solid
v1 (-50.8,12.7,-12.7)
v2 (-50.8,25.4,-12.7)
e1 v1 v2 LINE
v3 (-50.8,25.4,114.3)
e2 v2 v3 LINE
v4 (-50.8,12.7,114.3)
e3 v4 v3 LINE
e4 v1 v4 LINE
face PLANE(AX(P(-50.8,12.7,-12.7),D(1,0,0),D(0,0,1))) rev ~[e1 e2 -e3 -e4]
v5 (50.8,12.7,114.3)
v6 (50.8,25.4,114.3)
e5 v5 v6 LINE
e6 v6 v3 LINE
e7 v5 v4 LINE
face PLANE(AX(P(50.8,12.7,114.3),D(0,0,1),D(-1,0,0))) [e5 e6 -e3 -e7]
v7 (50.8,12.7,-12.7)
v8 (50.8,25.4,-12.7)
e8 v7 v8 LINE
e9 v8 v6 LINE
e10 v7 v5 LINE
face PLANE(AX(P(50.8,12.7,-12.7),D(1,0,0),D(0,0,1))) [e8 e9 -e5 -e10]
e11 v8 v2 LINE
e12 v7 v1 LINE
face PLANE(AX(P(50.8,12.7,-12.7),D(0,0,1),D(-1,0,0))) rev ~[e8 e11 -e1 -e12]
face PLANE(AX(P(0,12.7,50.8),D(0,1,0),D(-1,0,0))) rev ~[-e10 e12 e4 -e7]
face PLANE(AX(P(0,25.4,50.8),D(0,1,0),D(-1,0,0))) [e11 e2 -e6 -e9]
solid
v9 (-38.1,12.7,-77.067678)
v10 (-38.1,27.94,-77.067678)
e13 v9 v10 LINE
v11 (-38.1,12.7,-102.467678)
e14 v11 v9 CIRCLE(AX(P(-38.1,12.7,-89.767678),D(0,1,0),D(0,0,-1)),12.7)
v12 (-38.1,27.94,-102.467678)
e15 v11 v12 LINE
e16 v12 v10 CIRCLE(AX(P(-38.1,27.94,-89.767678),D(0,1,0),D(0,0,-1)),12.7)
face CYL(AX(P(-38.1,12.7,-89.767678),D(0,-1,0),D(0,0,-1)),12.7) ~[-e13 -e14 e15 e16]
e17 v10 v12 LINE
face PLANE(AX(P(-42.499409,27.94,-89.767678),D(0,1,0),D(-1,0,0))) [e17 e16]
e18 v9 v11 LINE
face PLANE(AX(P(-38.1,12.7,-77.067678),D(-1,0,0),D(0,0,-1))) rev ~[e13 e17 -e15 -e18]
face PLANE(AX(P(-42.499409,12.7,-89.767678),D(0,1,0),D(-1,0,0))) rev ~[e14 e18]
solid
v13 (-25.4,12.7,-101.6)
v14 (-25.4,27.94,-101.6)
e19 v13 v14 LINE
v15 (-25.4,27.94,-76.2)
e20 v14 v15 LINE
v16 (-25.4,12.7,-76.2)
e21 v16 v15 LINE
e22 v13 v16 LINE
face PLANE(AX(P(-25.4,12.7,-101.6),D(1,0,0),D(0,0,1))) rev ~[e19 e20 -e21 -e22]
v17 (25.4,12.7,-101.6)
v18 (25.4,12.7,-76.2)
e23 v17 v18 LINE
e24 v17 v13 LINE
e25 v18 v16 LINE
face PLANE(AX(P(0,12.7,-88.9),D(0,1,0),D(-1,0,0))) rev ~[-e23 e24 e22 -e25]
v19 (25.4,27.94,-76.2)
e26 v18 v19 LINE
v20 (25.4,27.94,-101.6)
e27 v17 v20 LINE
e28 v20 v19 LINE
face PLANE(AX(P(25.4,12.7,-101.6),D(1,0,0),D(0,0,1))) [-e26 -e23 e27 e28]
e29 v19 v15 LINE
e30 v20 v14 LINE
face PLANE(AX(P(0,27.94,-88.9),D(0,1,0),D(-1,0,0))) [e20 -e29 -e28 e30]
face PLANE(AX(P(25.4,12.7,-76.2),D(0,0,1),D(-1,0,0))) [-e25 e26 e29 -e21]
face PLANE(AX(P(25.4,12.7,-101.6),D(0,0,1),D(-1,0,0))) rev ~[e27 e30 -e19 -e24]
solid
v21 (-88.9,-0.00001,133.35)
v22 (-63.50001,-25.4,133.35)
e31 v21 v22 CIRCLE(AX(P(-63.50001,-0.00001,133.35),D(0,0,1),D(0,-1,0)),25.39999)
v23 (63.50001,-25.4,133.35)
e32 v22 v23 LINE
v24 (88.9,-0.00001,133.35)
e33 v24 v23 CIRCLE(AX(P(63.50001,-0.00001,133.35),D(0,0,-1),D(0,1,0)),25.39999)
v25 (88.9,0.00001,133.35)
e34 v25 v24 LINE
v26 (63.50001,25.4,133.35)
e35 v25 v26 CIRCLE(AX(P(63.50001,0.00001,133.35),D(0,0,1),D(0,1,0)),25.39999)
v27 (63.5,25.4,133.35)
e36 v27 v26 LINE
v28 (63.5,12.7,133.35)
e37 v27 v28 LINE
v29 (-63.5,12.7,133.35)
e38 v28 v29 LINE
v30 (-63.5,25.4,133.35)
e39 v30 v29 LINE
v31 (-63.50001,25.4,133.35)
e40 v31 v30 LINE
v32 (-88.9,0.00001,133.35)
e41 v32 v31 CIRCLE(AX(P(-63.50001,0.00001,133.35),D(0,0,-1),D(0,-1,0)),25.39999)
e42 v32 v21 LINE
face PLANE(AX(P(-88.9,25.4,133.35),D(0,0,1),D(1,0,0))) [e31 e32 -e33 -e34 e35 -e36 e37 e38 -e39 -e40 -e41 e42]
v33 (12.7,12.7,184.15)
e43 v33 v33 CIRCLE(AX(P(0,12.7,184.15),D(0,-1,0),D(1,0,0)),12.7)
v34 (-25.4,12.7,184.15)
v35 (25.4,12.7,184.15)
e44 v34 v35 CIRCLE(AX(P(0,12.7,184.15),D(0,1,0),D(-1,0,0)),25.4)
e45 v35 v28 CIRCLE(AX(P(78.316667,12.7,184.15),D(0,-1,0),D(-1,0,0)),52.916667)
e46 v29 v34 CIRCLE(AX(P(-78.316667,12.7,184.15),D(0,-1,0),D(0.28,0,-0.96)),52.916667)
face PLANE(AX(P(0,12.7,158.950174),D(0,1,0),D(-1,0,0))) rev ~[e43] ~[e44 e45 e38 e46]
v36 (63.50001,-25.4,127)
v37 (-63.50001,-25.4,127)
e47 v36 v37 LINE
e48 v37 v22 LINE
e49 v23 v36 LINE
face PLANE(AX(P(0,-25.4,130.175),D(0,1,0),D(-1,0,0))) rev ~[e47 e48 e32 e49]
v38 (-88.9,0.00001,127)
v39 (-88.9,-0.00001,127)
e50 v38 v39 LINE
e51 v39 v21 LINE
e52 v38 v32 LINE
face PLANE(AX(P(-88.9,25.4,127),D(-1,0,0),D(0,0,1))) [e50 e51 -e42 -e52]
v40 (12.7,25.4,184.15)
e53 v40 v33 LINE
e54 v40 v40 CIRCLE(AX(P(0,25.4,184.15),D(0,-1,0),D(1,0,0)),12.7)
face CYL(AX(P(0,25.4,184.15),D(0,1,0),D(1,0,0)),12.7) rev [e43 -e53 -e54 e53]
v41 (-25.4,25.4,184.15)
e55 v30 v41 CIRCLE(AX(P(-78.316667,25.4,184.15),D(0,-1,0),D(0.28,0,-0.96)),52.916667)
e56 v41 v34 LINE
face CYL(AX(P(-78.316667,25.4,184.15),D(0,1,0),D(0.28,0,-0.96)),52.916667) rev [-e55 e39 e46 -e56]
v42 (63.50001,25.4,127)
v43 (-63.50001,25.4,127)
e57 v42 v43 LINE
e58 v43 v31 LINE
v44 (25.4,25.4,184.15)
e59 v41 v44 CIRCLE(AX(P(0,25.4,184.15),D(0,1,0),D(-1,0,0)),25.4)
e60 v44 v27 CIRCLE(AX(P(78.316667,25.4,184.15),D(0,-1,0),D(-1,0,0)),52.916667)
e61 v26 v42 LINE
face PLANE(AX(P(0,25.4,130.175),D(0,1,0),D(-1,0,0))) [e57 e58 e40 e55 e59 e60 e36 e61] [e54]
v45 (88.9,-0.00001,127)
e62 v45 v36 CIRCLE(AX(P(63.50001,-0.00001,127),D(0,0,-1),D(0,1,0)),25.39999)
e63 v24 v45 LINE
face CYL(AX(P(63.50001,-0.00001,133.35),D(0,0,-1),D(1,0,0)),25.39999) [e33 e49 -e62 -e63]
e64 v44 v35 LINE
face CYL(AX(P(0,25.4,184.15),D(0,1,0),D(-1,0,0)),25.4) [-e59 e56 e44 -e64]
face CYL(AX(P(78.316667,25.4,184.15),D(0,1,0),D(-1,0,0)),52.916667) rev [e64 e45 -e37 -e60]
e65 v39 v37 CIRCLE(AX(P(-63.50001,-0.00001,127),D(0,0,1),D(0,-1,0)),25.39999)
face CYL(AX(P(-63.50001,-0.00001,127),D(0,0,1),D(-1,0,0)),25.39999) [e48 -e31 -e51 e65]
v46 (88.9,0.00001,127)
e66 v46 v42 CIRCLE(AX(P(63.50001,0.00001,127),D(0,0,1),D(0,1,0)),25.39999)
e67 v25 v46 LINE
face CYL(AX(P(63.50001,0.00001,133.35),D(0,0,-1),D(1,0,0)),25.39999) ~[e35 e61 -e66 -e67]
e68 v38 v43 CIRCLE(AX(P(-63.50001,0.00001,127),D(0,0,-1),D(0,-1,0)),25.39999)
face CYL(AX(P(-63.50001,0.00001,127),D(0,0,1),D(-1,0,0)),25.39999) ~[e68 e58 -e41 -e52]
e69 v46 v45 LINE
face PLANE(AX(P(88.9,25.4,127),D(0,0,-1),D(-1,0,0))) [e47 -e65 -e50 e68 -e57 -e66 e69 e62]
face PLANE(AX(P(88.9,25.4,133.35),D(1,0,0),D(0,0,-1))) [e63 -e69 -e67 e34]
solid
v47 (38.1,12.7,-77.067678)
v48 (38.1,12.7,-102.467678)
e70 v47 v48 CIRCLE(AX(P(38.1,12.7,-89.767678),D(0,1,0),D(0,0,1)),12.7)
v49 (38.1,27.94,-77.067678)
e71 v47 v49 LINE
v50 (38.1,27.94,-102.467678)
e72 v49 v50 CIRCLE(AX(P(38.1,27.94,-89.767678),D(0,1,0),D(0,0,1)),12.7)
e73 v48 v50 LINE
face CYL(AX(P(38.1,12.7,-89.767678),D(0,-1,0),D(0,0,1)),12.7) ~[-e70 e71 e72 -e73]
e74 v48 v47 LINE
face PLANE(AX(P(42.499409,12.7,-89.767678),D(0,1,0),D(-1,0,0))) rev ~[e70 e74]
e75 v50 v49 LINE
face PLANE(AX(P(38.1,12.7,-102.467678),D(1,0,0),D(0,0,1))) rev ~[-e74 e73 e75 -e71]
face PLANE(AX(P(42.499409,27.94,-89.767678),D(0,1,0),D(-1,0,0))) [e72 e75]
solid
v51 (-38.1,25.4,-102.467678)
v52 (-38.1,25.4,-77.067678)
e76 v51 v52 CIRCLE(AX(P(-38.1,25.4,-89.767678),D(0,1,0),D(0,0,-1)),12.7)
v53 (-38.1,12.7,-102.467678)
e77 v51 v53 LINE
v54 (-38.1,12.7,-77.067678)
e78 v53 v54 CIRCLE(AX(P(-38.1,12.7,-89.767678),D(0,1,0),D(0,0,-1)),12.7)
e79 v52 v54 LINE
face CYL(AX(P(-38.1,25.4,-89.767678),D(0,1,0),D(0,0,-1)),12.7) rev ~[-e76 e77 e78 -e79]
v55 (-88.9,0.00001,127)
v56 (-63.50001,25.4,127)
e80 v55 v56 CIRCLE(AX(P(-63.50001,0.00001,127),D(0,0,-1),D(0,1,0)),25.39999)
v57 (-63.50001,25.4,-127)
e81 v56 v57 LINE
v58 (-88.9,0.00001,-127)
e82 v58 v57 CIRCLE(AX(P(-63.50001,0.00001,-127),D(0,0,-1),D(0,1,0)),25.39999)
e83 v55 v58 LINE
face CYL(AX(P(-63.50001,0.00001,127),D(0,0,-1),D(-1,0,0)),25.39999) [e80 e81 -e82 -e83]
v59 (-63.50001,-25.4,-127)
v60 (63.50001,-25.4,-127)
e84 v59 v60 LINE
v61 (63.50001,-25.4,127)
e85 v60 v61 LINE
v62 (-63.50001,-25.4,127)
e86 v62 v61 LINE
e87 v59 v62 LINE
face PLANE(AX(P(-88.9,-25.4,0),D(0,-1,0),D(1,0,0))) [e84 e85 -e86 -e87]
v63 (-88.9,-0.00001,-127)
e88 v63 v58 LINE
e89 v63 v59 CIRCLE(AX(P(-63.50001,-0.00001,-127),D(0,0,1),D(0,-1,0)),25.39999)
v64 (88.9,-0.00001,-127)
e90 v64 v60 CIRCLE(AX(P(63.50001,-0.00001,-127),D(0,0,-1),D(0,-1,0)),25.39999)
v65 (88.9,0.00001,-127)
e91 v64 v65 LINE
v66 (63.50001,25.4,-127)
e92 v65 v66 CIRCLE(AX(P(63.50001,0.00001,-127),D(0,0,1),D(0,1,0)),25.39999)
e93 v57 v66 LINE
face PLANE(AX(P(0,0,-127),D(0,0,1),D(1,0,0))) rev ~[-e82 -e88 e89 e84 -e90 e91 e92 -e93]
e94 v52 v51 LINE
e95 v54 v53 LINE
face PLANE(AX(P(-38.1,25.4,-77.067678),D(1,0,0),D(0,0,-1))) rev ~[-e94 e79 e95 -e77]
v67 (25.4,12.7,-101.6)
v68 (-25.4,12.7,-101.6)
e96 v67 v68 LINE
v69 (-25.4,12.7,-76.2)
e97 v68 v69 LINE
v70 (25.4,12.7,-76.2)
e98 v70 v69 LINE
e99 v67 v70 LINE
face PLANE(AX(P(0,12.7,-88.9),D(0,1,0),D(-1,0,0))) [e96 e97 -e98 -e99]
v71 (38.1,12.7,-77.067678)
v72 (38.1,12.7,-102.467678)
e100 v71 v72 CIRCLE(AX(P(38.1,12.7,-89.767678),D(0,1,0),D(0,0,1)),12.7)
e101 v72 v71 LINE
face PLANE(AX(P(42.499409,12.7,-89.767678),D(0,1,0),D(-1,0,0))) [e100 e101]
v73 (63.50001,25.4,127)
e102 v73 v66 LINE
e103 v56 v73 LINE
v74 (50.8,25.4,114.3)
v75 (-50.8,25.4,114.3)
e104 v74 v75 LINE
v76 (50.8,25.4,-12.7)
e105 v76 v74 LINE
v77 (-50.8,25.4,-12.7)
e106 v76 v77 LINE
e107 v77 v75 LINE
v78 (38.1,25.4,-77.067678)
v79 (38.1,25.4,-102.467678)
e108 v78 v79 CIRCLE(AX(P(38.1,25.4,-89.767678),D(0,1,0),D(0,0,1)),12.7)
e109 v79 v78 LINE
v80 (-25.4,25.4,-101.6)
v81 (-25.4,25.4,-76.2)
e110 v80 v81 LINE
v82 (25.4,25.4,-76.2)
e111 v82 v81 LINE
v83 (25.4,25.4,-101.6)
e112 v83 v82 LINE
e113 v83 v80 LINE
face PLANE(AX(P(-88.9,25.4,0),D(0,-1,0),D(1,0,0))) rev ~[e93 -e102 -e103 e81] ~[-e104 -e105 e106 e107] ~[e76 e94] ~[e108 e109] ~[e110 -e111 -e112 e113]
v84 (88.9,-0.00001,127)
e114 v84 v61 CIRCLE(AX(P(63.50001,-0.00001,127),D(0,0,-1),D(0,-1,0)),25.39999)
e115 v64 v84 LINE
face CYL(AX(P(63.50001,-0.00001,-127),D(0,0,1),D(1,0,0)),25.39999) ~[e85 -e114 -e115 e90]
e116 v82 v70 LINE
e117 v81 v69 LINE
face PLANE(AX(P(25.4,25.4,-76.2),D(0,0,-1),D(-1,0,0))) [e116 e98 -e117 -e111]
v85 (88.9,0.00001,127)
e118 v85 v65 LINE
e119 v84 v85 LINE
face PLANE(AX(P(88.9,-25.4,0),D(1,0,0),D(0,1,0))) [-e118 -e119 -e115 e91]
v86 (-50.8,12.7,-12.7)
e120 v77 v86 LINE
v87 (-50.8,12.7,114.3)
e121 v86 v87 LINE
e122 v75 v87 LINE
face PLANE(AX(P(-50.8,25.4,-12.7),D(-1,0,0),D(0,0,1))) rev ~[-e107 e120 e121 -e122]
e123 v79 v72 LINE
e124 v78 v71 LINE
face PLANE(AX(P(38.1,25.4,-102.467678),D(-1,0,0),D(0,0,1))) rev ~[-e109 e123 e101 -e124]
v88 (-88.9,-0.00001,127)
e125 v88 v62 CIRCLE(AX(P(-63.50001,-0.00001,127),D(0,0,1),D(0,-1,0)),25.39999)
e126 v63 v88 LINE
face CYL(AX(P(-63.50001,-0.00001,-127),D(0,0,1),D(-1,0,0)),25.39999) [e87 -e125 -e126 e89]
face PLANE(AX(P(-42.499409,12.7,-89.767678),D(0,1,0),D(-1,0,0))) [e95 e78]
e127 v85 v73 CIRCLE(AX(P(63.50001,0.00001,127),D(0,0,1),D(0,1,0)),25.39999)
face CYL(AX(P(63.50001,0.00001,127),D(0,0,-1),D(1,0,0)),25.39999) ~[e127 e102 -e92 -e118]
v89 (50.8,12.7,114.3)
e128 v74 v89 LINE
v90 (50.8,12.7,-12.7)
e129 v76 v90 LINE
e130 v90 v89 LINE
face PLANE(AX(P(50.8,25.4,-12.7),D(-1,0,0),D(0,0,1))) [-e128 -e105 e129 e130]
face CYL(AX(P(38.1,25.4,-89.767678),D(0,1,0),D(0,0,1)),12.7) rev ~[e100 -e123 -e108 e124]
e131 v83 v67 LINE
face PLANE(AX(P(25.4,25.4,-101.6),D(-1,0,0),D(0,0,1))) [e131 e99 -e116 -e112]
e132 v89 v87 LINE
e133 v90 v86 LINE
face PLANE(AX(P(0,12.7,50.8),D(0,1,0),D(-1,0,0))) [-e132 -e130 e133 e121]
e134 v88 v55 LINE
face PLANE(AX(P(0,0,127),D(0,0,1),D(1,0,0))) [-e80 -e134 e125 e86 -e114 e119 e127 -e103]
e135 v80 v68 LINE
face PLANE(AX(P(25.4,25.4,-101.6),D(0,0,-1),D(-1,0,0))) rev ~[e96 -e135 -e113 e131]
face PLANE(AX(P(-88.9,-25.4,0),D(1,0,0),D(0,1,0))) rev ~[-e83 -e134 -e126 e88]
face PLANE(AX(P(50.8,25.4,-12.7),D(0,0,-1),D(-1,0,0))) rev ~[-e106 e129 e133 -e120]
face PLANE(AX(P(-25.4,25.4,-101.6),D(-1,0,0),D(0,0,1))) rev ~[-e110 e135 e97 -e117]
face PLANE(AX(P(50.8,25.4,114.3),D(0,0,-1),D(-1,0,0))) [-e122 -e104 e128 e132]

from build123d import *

# Parameters (mm, degrees)
F0_W      = 177.8
F0_H      = 50.8
F1_DEPTH  = 127
F2_R      = 25.39999
F3_W      = 101.6
F3_H      = 127
F3_W_2    = 50.8
F3_H_2    = 25.4
F4_DEPTH  = 12.7
F5_DEPTH  = 15.24
F6_DEPTH  = 15.24
F7_DEPTH  = 15.24
F8_DEPTH  = 12.7
F10_DEPTH = 50.8
F11_DEPTH = 12.7
F12_R     = 25.39999


# Not quite as in the source:
# - a fillet or chamfer is up to 0.001 mm smaller than in the source, because OpenCascade refuses the exact size
# - ends of sketch curves that miss each other by under 0.0002 mm in the source are joined


with BuildPart() as f1:
    # F0 (on Top) → F1 (new body, symmetric)
    with BuildSketch(Plane.XY):
        Rectangle(F0_W, F0_H)
    extrude(amount=F1_DEPTH, both=True)

    # F2 (radius 25.4 in the source; OpenCascade refuses exactly that, so slightly less here)
    f2_edges = [f1.edges().sort_by_distance(p)[0] for p in [
        (-88.9, -25.4, 0),
        (-88.9, 25.4, 0),
        (88.9, -25.4, 0),
        (88.9, 25.4, 0),
    ]]
    fillet(f2_edges, radius=F2_R)

    # F3 (on face) → F4 (cut)
    with BuildSketch(Plane(origin=(0, 25.4, 0), x_dir=(-1, 0, 0), z_dir=(0, 1, 0))):
        with Locations((0, 50.8)):
            Rectangle(F3_W, F3_H)
        with Locations((0, -88.9)):
            Rectangle(F3_W_2, F3_H_2)
        with BuildLine():
            Line((-38.1, -102.4676784873), (-38.1, -77.0676784873))
            ThreePointArc((-38.1, -77.0676784873), (-50.8, -89.7676784873), (-38.1, -102.4676784873))
        make_face()
        with BuildLine():
            ThreePointArc((38.1, -102.4676784873), (50.8, -89.7676784873), (38.1, -77.0676784873))
            Line((38.1, -77.0676784873), (38.1, -102.4676784873))
        make_face()
    extrude(amount=-F4_DEPTH, mode=Mode.SUBTRACT)


with BuildPart() as f5:
    # F5 (new): a face of the model
    f5_faces = [f1.part.faces().sort_by_distance(p)[0] for p in [
        (43.490047406, 12.7, -89.7676784873),
    ]]
    extrude(f5_faces, amount=F5_DEPTH)


with BuildPart() as f6:
    # F6 (new): a face of the model
    f6_faces = [f1.part.faces().sort_by_distance(p)[0] for p in [
        (0, 12.7, -88.9),
    ]]
    extrude(f6_faces, amount=F6_DEPTH)


with BuildPart() as f7:
    # F7 (new): a face of the model
    f7_faces = [f1.part.faces().sort_by_distance(p)[0] for p in [
        (-43.490047406, 12.7, -89.7676784873),
    ]]
    extrude(f7_faces, amount=F7_DEPTH)


with BuildPart() as f8:
    # F8 (new): a face of the model
    f8_faces = [f1.part.faces().sort_by_distance(p)[0] for p in [
        (0, 12.7, 50.8),
    ]]
    extrude(f8_faces, amount=F8_DEPTH)


with BuildPart() as f10:
    # F9 (on face) → F10 (new body)
    with BuildSketch(Plane(origin=(0, 25.4, 0), x_dir=(-1, 0, 0), z_dir=(0, 1, 0))):
        Polygon((-88.9, 127), (-63.5000066667, 127), (63.5, 127), (88.9, 127), (88.9, 133.35), (63.5, 133.35), (25.4, 133.35), (-25.4, 133.35), (-63.5, 133.35), (-88.9, 133.35), align=None)
    extrude(amount=-F10_DEPTH)

    # F9 (on face) → F11 (join)
    with BuildSketch(Plane(origin=(0, 25.4, 0), x_dir=(-1, 0, 0), z_dir=(0, 1, 0))):
        with BuildLine():
            Line((-25.4, 184.15), (-25.4, 133.35))
            Line((-25.4, 133.35), (25.4, 133.35))
            Line((25.4, 133.35), (25.4, 184.15))
            Line((25.4, 184.15), (12.7, 184.15))
            ThreePointArc((12.7, 184.15), (0, 171.45), (-12.7, 184.15))
            Line((-12.7, 184.15), (-25.4, 184.15))
        make_face()
        with BuildLine():
            Line((25.4, 133.35), (63.5, 133.35))
            ThreePointArc((63.5, 133.35), (35.9833333333, 152.4), (25.4, 184.15))
            Line((25.4, 184.15), (25.4, 133.35))
        make_face()
        with BuildLine():
            ThreePointArc((-25.4, 184.15), (-35.9833333333, 152.4), (-63.5, 133.35))
            Line((-63.5, 133.35), (-25.4, 133.35))
            Line((-25.4, 133.35), (-25.4, 184.15))
        make_face()
        with BuildLine():
            ThreePointArc((25.4, 184.15), (0, 209.55), (-25.4, 184.15))
            Line((-25.4, 184.15), (-12.7, 184.15))
            ThreePointArc((-12.7, 184.15), (0, 196.85), (12.7, 184.15))
            Line((12.7, 184.15), (25.4, 184.15))
        make_face()
    extrude(amount=-F11_DEPTH)

    # F12 (radius 25.4 in the source; OpenCascade refuses exactly that, so slightly less here)
    f12_edges = [f10.edges().sort_by_distance(p)[0] for p in [
        (-88.9, -25.4, 130.175),
        (-88.9, 25.4, 130.175),
        (88.9, -25.4, 130.175),
        (88.9, 25.4, 130.175),
    ]]
    fillet(f12_edges, radius=F12_R)


solid = Compound([f1.part, f5.part, f6.part, f7.part, f8.part, f10.part])
